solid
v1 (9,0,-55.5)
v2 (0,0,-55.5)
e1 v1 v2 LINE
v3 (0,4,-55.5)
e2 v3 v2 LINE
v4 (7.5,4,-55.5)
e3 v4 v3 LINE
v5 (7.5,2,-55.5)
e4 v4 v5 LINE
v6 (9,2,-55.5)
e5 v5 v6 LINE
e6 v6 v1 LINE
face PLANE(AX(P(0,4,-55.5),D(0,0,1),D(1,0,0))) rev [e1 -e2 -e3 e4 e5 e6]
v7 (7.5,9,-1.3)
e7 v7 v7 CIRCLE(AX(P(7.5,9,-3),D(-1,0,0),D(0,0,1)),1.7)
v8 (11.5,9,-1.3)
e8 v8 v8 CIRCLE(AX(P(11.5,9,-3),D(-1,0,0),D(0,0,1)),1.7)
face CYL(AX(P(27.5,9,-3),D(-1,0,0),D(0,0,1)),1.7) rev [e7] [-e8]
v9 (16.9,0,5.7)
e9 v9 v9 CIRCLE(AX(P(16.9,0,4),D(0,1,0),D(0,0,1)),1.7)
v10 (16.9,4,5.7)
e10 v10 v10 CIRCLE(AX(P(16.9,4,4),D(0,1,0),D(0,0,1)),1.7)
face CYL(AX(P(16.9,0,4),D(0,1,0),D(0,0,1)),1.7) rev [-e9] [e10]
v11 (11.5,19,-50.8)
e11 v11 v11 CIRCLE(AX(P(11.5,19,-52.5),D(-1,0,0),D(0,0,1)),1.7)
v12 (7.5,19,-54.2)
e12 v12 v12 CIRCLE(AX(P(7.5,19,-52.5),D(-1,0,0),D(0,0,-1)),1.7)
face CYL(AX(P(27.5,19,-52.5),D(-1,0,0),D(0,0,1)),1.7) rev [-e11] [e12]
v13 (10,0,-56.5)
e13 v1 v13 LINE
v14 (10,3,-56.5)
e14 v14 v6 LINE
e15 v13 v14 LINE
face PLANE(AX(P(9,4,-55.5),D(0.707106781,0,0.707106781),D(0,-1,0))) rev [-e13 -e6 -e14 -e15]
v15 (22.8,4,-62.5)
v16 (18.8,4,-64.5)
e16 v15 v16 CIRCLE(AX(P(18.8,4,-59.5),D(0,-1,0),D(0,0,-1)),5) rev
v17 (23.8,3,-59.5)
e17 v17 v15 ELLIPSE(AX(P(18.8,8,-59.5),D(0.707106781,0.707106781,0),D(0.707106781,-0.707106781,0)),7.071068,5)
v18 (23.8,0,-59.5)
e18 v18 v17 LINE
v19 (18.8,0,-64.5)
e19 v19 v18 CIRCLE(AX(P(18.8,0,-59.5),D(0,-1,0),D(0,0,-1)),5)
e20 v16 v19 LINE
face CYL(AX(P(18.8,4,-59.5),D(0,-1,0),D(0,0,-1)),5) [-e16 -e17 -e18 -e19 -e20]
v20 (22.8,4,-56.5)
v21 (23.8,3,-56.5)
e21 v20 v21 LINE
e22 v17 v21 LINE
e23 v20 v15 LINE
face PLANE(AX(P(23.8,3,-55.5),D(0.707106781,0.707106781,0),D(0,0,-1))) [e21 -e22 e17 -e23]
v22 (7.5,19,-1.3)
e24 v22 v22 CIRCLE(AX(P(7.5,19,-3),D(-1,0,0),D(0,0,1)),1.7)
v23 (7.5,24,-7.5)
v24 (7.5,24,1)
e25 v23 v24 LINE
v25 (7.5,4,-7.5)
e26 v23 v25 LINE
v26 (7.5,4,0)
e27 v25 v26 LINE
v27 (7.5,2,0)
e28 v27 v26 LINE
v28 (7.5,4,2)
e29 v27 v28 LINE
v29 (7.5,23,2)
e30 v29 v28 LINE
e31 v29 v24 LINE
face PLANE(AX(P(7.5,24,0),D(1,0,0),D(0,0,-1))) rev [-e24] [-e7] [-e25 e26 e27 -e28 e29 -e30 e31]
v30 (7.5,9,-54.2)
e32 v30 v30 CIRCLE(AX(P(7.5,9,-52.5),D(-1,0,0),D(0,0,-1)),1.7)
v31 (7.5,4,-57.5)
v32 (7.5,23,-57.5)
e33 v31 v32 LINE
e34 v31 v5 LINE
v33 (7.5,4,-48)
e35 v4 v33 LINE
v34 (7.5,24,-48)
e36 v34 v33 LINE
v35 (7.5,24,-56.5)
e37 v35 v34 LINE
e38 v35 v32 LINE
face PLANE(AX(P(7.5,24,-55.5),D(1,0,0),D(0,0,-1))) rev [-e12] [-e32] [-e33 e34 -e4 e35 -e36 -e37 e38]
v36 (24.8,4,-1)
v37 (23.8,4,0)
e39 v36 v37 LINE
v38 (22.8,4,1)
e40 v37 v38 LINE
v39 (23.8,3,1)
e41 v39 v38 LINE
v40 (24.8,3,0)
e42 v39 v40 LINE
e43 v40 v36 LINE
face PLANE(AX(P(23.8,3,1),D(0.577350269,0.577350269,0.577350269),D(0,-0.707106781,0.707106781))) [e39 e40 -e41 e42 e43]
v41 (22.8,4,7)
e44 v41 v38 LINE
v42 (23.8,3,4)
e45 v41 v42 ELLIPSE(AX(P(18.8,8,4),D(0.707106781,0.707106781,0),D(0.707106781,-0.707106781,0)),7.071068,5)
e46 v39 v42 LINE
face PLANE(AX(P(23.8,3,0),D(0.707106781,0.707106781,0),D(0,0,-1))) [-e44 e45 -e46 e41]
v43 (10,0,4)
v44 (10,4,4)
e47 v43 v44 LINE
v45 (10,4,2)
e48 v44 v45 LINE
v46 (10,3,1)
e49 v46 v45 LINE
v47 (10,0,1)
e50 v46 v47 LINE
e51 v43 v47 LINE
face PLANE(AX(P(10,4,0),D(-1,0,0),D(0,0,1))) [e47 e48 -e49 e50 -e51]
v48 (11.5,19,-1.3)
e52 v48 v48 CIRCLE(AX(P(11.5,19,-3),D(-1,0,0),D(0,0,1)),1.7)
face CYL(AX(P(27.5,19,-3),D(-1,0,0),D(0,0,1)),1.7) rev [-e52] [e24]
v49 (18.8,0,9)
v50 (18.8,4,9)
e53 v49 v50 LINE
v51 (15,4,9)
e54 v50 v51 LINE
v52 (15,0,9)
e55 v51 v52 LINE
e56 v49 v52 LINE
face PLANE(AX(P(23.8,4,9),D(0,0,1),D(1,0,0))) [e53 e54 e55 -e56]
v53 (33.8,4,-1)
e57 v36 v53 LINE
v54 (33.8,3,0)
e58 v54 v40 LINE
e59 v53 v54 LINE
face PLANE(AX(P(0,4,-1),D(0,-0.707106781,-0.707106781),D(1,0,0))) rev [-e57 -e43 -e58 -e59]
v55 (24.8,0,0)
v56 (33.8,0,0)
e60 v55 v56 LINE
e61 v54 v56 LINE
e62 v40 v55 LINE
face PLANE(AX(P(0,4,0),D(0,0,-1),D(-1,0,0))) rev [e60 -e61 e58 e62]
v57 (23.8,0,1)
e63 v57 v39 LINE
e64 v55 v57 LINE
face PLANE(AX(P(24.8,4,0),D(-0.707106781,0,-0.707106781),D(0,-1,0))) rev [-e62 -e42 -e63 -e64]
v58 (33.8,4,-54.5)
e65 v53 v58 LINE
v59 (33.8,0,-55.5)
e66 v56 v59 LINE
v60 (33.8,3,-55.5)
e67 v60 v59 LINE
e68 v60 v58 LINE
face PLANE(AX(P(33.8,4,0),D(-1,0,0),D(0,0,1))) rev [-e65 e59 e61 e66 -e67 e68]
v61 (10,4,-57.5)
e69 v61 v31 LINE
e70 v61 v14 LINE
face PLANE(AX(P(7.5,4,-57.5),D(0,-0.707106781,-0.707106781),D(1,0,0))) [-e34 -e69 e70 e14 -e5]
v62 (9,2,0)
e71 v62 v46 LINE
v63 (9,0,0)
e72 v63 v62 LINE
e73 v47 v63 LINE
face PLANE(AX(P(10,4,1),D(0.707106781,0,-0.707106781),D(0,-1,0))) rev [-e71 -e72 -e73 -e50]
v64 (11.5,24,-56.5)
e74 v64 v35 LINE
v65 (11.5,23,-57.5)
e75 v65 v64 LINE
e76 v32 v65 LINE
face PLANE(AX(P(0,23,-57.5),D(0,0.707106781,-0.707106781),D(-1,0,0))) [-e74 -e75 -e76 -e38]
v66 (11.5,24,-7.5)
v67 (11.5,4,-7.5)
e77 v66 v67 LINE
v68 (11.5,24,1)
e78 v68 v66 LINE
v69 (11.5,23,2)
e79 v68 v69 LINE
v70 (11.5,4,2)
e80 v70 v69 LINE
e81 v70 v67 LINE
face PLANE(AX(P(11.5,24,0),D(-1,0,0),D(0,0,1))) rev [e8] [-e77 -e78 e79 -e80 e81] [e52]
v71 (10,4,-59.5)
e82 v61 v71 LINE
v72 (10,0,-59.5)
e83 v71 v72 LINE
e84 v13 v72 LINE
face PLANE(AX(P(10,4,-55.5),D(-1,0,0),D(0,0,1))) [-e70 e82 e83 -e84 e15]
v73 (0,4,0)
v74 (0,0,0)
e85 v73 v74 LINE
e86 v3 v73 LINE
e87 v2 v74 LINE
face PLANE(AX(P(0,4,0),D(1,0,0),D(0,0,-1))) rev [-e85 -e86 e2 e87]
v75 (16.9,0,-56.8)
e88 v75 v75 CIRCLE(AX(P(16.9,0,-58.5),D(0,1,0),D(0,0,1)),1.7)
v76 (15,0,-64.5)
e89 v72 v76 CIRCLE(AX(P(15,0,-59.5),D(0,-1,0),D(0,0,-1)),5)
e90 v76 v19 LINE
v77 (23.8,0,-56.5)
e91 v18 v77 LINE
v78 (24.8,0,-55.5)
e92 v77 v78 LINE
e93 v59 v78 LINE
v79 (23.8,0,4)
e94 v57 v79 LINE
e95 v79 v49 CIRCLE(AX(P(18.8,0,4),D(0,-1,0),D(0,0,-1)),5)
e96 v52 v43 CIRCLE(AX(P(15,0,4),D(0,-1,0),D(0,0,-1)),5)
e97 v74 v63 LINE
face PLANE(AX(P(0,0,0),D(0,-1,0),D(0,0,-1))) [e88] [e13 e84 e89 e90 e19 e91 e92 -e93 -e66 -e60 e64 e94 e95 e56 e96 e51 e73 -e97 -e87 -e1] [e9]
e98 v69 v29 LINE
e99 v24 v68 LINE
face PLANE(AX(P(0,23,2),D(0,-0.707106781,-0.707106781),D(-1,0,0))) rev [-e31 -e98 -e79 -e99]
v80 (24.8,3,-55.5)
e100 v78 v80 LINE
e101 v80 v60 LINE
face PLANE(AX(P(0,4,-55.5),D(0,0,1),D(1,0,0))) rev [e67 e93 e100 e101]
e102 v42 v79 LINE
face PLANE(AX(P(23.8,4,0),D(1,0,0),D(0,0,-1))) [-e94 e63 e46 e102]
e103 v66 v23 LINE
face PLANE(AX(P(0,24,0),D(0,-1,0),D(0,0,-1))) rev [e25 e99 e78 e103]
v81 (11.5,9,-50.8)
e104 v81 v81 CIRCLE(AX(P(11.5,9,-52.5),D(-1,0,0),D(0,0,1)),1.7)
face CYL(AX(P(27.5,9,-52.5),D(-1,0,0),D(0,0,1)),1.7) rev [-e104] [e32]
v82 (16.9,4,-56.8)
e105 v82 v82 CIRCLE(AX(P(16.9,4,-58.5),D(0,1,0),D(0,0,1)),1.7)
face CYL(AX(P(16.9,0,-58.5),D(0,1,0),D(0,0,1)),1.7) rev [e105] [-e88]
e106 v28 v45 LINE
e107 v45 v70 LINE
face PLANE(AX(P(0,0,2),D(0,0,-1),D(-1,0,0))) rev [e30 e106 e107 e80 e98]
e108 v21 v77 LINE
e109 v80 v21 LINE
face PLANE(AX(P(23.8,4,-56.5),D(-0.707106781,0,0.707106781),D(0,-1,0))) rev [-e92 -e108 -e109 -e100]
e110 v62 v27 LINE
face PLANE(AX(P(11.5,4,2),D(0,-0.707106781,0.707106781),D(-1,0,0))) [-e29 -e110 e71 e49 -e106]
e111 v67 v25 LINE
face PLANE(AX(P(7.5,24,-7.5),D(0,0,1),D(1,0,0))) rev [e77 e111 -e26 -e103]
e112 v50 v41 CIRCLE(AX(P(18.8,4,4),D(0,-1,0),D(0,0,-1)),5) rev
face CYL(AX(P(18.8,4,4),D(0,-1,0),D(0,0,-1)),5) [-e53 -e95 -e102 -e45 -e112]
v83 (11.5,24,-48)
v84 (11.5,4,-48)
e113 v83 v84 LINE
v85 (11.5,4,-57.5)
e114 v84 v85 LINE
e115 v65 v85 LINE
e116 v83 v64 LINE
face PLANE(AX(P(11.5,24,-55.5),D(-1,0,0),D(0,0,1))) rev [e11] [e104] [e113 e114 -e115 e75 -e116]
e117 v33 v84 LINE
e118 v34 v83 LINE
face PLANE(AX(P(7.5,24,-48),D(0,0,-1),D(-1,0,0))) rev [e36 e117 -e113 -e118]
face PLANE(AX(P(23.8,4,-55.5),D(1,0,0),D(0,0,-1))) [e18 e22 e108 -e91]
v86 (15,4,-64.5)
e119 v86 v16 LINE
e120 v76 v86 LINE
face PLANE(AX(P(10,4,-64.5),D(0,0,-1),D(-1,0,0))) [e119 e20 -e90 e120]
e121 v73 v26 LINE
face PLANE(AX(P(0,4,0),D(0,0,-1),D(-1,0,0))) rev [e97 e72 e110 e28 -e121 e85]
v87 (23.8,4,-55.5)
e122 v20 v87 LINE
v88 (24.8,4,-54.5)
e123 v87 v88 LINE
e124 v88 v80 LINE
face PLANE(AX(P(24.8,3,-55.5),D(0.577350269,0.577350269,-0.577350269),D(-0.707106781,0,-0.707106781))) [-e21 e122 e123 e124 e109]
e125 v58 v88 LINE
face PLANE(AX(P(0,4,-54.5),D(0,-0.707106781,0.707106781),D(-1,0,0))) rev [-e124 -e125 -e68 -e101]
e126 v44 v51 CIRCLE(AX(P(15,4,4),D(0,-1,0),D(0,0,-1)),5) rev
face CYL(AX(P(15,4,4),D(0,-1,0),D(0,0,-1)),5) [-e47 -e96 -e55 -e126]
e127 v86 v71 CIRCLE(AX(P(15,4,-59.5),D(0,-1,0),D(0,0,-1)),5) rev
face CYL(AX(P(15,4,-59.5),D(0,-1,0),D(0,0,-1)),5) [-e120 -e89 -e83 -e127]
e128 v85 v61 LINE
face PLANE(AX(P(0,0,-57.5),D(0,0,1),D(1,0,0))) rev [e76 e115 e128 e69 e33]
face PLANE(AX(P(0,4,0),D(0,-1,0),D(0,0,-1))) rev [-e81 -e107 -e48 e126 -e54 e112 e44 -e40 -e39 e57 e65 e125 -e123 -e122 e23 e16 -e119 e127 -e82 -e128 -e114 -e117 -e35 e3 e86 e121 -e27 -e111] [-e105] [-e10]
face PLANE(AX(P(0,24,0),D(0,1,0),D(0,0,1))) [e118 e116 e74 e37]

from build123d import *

# Parameters (mm, degrees)
SKETCH1_W           = 33.8
SKETCH1_H           = 55.5
BOSS_EXTRUDE1_DEPTH = 4
SKETCH3_W           = 4
SKETCH3_H           = 7.5
BOSS_EXTRUDE2_DEPTH = 20
SKETCH4_R           = 1.7
CUT_EXTRUDE1_DEPTH  = 20
SKETCH5_W           = 4
SKETCH5_H           = 20
BOSS_EXTRUDE3_DEPTH = 2
SKETCH6_W           = 4
SKETCH6_H           = 20
BOSS_EXTRUDE4_DEPTH = 2
CHAMFER1_SIZE       = 2
CHAMFER3_SIZE       = 1
SKETCH7_W           = 13.8
SKETCH7_H           = 9
BOSS_EXTRUDE5_DEPTH = 4
CHAMFER4_SIZE       = 1
FILLET1_R           = 5
SKETCH8_R           = 1.7
CUT_EXTRUDE2_DEPTH  = 4


with BuildPart() as part:
    # Sketch1 → Boss-Extrude1 (new body)
    with BuildSketch(Plane(origin=(0, 0, 0), x_dir=(1, 0, 0), z_dir=(0, 1, 0))):
        with Locations((16.9, 27.75)):
            Rectangle(SKETCH1_W, SKETCH1_H)
    extrude(amount=BOSS_EXTRUDE1_DEPTH)

    # Sketch3 → Boss-Extrude2 (add)
    with BuildSketch(Plane(origin=(0, 4, 0), x_dir=(1, 0, 0), z_dir=(0, 1, 0))):
        with Locations((9.5, 3.75)):
            Rectangle(SKETCH3_W, SKETCH3_H)
        with Locations((9.5, 51.75)):
            Rectangle(SKETCH3_W, SKETCH3_H)
    extrude(amount=BOSS_EXTRUDE2_DEPTH)

    # Sketch4 → Cut-Extrude1 (cut)
    with BuildSketch(Plane.ZY.offset(-7.5)):
        with Locations((-3, 19)):
            Circle(SKETCH4_R)
        with Locations((-3, 9)):
            Circle(SKETCH4_R)
        with Locations((-52.5, 9)):
            Circle(SKETCH4_R)
        with Locations((-52.5, 19)):
            Circle(SKETCH4_R)
    extrude(amount=-CUT_EXTRUDE1_DEPTH, mode=Mode.SUBTRACT)

    # Sketch5 → Boss-Extrude3 (add)
    with BuildSketch(Plane.XY):
        with Locations((9.5, 14)):
            Rectangle(SKETCH5_W, SKETCH5_H)
    extrude(amount=BOSS_EXTRUDE3_DEPTH)

    # Sketch6 → Boss-Extrude4 (add)
    with BuildSketch(Plane(origin=(0, 0, -55.5), x_dir=(-1, 0, 0), z_dir=(0, 0, -1))):
        with Locations((-9.5, 14)):
            Rectangle(SKETCH6_W, SKETCH6_H)
    extrude(amount=BOSS_EXTRUDE4_DEPTH)

    # Chamfer1
    chamfer1_edges = [part.edges().sort_by_distance(p)[0] for p in [
        (9.5, 4, 0),
        (9.5, 4, -55.5),
    ]]
    chamfer(chamfer1_edges, length=CHAMFER1_SIZE - 0.0001)  # a hair under: the kernel refuses the full size

    # Chamfer3
    chamfer3_edges = [part.edges().sort_by_distance(p)[0] for p in [
        (9.5, 24, 2),
        (9.5, 24, -57.5),
    ]]
    chamfer(chamfer3_edges, length=CHAMFER3_SIZE)

    # Sketch7 → Boss-Extrude5 (add)
    with BuildSketch(Plane.XZ):
        with Locations((16.9, 4.5)):
            Rectangle(SKETCH7_W, SKETCH7_H)
        with Locations((16.9, -60)):
            Rectangle(SKETCH7_W, SKETCH7_H)
    extrude(amount=-BOSS_EXTRUDE5_DEPTH)

    # Chamfer4
    chamfer4_edges = [part.edges().sort_by_distance(p)[0] for p in [
        (28.8, 4, 0),
        (23.8, 2, 0),
        (10, 1.00005, 0),
        (23.8, 4, 4.5),
        (10, 1.00005, -55.5),
        (23.8, 4, -60),
        (23.8, 2, -55.5),
        (28.8, 4, -55.5),
    ]]
    chamfer(chamfer4_edges, length=CHAMFER4_SIZE)

    # Fillet1
    fillet1_edges = [part.edges().sort_by_distance(p)[0] for p in [
        (10, 2, -64.5),
        (23.8, 1.5, -64.5),
        (10, 2, 9),
        (23.8, 1.5, 9),
    ]]
    fillet(fillet1_edges, radius=FILLET1_R)

    # Sketch8 → Cut-Extrude2 (cut)
    with BuildSketch(Plane(origin=(0, 4, 0), x_dir=(1, 0, 0), z_dir=(0, 1, 0))):
        with Locations(Location((16.9, 58.5, 0), (0, 0, 270))):
            Circle(SKETCH8_R)
        with Locations(Location((16.9, -4, 0), (0, 0, 270))):
            Circle(SKETCH8_R)
    extrude(amount=-CUT_EXTRUDE2_DEPTH, mode=Mode.SUBTRACT)


solid = part.part
